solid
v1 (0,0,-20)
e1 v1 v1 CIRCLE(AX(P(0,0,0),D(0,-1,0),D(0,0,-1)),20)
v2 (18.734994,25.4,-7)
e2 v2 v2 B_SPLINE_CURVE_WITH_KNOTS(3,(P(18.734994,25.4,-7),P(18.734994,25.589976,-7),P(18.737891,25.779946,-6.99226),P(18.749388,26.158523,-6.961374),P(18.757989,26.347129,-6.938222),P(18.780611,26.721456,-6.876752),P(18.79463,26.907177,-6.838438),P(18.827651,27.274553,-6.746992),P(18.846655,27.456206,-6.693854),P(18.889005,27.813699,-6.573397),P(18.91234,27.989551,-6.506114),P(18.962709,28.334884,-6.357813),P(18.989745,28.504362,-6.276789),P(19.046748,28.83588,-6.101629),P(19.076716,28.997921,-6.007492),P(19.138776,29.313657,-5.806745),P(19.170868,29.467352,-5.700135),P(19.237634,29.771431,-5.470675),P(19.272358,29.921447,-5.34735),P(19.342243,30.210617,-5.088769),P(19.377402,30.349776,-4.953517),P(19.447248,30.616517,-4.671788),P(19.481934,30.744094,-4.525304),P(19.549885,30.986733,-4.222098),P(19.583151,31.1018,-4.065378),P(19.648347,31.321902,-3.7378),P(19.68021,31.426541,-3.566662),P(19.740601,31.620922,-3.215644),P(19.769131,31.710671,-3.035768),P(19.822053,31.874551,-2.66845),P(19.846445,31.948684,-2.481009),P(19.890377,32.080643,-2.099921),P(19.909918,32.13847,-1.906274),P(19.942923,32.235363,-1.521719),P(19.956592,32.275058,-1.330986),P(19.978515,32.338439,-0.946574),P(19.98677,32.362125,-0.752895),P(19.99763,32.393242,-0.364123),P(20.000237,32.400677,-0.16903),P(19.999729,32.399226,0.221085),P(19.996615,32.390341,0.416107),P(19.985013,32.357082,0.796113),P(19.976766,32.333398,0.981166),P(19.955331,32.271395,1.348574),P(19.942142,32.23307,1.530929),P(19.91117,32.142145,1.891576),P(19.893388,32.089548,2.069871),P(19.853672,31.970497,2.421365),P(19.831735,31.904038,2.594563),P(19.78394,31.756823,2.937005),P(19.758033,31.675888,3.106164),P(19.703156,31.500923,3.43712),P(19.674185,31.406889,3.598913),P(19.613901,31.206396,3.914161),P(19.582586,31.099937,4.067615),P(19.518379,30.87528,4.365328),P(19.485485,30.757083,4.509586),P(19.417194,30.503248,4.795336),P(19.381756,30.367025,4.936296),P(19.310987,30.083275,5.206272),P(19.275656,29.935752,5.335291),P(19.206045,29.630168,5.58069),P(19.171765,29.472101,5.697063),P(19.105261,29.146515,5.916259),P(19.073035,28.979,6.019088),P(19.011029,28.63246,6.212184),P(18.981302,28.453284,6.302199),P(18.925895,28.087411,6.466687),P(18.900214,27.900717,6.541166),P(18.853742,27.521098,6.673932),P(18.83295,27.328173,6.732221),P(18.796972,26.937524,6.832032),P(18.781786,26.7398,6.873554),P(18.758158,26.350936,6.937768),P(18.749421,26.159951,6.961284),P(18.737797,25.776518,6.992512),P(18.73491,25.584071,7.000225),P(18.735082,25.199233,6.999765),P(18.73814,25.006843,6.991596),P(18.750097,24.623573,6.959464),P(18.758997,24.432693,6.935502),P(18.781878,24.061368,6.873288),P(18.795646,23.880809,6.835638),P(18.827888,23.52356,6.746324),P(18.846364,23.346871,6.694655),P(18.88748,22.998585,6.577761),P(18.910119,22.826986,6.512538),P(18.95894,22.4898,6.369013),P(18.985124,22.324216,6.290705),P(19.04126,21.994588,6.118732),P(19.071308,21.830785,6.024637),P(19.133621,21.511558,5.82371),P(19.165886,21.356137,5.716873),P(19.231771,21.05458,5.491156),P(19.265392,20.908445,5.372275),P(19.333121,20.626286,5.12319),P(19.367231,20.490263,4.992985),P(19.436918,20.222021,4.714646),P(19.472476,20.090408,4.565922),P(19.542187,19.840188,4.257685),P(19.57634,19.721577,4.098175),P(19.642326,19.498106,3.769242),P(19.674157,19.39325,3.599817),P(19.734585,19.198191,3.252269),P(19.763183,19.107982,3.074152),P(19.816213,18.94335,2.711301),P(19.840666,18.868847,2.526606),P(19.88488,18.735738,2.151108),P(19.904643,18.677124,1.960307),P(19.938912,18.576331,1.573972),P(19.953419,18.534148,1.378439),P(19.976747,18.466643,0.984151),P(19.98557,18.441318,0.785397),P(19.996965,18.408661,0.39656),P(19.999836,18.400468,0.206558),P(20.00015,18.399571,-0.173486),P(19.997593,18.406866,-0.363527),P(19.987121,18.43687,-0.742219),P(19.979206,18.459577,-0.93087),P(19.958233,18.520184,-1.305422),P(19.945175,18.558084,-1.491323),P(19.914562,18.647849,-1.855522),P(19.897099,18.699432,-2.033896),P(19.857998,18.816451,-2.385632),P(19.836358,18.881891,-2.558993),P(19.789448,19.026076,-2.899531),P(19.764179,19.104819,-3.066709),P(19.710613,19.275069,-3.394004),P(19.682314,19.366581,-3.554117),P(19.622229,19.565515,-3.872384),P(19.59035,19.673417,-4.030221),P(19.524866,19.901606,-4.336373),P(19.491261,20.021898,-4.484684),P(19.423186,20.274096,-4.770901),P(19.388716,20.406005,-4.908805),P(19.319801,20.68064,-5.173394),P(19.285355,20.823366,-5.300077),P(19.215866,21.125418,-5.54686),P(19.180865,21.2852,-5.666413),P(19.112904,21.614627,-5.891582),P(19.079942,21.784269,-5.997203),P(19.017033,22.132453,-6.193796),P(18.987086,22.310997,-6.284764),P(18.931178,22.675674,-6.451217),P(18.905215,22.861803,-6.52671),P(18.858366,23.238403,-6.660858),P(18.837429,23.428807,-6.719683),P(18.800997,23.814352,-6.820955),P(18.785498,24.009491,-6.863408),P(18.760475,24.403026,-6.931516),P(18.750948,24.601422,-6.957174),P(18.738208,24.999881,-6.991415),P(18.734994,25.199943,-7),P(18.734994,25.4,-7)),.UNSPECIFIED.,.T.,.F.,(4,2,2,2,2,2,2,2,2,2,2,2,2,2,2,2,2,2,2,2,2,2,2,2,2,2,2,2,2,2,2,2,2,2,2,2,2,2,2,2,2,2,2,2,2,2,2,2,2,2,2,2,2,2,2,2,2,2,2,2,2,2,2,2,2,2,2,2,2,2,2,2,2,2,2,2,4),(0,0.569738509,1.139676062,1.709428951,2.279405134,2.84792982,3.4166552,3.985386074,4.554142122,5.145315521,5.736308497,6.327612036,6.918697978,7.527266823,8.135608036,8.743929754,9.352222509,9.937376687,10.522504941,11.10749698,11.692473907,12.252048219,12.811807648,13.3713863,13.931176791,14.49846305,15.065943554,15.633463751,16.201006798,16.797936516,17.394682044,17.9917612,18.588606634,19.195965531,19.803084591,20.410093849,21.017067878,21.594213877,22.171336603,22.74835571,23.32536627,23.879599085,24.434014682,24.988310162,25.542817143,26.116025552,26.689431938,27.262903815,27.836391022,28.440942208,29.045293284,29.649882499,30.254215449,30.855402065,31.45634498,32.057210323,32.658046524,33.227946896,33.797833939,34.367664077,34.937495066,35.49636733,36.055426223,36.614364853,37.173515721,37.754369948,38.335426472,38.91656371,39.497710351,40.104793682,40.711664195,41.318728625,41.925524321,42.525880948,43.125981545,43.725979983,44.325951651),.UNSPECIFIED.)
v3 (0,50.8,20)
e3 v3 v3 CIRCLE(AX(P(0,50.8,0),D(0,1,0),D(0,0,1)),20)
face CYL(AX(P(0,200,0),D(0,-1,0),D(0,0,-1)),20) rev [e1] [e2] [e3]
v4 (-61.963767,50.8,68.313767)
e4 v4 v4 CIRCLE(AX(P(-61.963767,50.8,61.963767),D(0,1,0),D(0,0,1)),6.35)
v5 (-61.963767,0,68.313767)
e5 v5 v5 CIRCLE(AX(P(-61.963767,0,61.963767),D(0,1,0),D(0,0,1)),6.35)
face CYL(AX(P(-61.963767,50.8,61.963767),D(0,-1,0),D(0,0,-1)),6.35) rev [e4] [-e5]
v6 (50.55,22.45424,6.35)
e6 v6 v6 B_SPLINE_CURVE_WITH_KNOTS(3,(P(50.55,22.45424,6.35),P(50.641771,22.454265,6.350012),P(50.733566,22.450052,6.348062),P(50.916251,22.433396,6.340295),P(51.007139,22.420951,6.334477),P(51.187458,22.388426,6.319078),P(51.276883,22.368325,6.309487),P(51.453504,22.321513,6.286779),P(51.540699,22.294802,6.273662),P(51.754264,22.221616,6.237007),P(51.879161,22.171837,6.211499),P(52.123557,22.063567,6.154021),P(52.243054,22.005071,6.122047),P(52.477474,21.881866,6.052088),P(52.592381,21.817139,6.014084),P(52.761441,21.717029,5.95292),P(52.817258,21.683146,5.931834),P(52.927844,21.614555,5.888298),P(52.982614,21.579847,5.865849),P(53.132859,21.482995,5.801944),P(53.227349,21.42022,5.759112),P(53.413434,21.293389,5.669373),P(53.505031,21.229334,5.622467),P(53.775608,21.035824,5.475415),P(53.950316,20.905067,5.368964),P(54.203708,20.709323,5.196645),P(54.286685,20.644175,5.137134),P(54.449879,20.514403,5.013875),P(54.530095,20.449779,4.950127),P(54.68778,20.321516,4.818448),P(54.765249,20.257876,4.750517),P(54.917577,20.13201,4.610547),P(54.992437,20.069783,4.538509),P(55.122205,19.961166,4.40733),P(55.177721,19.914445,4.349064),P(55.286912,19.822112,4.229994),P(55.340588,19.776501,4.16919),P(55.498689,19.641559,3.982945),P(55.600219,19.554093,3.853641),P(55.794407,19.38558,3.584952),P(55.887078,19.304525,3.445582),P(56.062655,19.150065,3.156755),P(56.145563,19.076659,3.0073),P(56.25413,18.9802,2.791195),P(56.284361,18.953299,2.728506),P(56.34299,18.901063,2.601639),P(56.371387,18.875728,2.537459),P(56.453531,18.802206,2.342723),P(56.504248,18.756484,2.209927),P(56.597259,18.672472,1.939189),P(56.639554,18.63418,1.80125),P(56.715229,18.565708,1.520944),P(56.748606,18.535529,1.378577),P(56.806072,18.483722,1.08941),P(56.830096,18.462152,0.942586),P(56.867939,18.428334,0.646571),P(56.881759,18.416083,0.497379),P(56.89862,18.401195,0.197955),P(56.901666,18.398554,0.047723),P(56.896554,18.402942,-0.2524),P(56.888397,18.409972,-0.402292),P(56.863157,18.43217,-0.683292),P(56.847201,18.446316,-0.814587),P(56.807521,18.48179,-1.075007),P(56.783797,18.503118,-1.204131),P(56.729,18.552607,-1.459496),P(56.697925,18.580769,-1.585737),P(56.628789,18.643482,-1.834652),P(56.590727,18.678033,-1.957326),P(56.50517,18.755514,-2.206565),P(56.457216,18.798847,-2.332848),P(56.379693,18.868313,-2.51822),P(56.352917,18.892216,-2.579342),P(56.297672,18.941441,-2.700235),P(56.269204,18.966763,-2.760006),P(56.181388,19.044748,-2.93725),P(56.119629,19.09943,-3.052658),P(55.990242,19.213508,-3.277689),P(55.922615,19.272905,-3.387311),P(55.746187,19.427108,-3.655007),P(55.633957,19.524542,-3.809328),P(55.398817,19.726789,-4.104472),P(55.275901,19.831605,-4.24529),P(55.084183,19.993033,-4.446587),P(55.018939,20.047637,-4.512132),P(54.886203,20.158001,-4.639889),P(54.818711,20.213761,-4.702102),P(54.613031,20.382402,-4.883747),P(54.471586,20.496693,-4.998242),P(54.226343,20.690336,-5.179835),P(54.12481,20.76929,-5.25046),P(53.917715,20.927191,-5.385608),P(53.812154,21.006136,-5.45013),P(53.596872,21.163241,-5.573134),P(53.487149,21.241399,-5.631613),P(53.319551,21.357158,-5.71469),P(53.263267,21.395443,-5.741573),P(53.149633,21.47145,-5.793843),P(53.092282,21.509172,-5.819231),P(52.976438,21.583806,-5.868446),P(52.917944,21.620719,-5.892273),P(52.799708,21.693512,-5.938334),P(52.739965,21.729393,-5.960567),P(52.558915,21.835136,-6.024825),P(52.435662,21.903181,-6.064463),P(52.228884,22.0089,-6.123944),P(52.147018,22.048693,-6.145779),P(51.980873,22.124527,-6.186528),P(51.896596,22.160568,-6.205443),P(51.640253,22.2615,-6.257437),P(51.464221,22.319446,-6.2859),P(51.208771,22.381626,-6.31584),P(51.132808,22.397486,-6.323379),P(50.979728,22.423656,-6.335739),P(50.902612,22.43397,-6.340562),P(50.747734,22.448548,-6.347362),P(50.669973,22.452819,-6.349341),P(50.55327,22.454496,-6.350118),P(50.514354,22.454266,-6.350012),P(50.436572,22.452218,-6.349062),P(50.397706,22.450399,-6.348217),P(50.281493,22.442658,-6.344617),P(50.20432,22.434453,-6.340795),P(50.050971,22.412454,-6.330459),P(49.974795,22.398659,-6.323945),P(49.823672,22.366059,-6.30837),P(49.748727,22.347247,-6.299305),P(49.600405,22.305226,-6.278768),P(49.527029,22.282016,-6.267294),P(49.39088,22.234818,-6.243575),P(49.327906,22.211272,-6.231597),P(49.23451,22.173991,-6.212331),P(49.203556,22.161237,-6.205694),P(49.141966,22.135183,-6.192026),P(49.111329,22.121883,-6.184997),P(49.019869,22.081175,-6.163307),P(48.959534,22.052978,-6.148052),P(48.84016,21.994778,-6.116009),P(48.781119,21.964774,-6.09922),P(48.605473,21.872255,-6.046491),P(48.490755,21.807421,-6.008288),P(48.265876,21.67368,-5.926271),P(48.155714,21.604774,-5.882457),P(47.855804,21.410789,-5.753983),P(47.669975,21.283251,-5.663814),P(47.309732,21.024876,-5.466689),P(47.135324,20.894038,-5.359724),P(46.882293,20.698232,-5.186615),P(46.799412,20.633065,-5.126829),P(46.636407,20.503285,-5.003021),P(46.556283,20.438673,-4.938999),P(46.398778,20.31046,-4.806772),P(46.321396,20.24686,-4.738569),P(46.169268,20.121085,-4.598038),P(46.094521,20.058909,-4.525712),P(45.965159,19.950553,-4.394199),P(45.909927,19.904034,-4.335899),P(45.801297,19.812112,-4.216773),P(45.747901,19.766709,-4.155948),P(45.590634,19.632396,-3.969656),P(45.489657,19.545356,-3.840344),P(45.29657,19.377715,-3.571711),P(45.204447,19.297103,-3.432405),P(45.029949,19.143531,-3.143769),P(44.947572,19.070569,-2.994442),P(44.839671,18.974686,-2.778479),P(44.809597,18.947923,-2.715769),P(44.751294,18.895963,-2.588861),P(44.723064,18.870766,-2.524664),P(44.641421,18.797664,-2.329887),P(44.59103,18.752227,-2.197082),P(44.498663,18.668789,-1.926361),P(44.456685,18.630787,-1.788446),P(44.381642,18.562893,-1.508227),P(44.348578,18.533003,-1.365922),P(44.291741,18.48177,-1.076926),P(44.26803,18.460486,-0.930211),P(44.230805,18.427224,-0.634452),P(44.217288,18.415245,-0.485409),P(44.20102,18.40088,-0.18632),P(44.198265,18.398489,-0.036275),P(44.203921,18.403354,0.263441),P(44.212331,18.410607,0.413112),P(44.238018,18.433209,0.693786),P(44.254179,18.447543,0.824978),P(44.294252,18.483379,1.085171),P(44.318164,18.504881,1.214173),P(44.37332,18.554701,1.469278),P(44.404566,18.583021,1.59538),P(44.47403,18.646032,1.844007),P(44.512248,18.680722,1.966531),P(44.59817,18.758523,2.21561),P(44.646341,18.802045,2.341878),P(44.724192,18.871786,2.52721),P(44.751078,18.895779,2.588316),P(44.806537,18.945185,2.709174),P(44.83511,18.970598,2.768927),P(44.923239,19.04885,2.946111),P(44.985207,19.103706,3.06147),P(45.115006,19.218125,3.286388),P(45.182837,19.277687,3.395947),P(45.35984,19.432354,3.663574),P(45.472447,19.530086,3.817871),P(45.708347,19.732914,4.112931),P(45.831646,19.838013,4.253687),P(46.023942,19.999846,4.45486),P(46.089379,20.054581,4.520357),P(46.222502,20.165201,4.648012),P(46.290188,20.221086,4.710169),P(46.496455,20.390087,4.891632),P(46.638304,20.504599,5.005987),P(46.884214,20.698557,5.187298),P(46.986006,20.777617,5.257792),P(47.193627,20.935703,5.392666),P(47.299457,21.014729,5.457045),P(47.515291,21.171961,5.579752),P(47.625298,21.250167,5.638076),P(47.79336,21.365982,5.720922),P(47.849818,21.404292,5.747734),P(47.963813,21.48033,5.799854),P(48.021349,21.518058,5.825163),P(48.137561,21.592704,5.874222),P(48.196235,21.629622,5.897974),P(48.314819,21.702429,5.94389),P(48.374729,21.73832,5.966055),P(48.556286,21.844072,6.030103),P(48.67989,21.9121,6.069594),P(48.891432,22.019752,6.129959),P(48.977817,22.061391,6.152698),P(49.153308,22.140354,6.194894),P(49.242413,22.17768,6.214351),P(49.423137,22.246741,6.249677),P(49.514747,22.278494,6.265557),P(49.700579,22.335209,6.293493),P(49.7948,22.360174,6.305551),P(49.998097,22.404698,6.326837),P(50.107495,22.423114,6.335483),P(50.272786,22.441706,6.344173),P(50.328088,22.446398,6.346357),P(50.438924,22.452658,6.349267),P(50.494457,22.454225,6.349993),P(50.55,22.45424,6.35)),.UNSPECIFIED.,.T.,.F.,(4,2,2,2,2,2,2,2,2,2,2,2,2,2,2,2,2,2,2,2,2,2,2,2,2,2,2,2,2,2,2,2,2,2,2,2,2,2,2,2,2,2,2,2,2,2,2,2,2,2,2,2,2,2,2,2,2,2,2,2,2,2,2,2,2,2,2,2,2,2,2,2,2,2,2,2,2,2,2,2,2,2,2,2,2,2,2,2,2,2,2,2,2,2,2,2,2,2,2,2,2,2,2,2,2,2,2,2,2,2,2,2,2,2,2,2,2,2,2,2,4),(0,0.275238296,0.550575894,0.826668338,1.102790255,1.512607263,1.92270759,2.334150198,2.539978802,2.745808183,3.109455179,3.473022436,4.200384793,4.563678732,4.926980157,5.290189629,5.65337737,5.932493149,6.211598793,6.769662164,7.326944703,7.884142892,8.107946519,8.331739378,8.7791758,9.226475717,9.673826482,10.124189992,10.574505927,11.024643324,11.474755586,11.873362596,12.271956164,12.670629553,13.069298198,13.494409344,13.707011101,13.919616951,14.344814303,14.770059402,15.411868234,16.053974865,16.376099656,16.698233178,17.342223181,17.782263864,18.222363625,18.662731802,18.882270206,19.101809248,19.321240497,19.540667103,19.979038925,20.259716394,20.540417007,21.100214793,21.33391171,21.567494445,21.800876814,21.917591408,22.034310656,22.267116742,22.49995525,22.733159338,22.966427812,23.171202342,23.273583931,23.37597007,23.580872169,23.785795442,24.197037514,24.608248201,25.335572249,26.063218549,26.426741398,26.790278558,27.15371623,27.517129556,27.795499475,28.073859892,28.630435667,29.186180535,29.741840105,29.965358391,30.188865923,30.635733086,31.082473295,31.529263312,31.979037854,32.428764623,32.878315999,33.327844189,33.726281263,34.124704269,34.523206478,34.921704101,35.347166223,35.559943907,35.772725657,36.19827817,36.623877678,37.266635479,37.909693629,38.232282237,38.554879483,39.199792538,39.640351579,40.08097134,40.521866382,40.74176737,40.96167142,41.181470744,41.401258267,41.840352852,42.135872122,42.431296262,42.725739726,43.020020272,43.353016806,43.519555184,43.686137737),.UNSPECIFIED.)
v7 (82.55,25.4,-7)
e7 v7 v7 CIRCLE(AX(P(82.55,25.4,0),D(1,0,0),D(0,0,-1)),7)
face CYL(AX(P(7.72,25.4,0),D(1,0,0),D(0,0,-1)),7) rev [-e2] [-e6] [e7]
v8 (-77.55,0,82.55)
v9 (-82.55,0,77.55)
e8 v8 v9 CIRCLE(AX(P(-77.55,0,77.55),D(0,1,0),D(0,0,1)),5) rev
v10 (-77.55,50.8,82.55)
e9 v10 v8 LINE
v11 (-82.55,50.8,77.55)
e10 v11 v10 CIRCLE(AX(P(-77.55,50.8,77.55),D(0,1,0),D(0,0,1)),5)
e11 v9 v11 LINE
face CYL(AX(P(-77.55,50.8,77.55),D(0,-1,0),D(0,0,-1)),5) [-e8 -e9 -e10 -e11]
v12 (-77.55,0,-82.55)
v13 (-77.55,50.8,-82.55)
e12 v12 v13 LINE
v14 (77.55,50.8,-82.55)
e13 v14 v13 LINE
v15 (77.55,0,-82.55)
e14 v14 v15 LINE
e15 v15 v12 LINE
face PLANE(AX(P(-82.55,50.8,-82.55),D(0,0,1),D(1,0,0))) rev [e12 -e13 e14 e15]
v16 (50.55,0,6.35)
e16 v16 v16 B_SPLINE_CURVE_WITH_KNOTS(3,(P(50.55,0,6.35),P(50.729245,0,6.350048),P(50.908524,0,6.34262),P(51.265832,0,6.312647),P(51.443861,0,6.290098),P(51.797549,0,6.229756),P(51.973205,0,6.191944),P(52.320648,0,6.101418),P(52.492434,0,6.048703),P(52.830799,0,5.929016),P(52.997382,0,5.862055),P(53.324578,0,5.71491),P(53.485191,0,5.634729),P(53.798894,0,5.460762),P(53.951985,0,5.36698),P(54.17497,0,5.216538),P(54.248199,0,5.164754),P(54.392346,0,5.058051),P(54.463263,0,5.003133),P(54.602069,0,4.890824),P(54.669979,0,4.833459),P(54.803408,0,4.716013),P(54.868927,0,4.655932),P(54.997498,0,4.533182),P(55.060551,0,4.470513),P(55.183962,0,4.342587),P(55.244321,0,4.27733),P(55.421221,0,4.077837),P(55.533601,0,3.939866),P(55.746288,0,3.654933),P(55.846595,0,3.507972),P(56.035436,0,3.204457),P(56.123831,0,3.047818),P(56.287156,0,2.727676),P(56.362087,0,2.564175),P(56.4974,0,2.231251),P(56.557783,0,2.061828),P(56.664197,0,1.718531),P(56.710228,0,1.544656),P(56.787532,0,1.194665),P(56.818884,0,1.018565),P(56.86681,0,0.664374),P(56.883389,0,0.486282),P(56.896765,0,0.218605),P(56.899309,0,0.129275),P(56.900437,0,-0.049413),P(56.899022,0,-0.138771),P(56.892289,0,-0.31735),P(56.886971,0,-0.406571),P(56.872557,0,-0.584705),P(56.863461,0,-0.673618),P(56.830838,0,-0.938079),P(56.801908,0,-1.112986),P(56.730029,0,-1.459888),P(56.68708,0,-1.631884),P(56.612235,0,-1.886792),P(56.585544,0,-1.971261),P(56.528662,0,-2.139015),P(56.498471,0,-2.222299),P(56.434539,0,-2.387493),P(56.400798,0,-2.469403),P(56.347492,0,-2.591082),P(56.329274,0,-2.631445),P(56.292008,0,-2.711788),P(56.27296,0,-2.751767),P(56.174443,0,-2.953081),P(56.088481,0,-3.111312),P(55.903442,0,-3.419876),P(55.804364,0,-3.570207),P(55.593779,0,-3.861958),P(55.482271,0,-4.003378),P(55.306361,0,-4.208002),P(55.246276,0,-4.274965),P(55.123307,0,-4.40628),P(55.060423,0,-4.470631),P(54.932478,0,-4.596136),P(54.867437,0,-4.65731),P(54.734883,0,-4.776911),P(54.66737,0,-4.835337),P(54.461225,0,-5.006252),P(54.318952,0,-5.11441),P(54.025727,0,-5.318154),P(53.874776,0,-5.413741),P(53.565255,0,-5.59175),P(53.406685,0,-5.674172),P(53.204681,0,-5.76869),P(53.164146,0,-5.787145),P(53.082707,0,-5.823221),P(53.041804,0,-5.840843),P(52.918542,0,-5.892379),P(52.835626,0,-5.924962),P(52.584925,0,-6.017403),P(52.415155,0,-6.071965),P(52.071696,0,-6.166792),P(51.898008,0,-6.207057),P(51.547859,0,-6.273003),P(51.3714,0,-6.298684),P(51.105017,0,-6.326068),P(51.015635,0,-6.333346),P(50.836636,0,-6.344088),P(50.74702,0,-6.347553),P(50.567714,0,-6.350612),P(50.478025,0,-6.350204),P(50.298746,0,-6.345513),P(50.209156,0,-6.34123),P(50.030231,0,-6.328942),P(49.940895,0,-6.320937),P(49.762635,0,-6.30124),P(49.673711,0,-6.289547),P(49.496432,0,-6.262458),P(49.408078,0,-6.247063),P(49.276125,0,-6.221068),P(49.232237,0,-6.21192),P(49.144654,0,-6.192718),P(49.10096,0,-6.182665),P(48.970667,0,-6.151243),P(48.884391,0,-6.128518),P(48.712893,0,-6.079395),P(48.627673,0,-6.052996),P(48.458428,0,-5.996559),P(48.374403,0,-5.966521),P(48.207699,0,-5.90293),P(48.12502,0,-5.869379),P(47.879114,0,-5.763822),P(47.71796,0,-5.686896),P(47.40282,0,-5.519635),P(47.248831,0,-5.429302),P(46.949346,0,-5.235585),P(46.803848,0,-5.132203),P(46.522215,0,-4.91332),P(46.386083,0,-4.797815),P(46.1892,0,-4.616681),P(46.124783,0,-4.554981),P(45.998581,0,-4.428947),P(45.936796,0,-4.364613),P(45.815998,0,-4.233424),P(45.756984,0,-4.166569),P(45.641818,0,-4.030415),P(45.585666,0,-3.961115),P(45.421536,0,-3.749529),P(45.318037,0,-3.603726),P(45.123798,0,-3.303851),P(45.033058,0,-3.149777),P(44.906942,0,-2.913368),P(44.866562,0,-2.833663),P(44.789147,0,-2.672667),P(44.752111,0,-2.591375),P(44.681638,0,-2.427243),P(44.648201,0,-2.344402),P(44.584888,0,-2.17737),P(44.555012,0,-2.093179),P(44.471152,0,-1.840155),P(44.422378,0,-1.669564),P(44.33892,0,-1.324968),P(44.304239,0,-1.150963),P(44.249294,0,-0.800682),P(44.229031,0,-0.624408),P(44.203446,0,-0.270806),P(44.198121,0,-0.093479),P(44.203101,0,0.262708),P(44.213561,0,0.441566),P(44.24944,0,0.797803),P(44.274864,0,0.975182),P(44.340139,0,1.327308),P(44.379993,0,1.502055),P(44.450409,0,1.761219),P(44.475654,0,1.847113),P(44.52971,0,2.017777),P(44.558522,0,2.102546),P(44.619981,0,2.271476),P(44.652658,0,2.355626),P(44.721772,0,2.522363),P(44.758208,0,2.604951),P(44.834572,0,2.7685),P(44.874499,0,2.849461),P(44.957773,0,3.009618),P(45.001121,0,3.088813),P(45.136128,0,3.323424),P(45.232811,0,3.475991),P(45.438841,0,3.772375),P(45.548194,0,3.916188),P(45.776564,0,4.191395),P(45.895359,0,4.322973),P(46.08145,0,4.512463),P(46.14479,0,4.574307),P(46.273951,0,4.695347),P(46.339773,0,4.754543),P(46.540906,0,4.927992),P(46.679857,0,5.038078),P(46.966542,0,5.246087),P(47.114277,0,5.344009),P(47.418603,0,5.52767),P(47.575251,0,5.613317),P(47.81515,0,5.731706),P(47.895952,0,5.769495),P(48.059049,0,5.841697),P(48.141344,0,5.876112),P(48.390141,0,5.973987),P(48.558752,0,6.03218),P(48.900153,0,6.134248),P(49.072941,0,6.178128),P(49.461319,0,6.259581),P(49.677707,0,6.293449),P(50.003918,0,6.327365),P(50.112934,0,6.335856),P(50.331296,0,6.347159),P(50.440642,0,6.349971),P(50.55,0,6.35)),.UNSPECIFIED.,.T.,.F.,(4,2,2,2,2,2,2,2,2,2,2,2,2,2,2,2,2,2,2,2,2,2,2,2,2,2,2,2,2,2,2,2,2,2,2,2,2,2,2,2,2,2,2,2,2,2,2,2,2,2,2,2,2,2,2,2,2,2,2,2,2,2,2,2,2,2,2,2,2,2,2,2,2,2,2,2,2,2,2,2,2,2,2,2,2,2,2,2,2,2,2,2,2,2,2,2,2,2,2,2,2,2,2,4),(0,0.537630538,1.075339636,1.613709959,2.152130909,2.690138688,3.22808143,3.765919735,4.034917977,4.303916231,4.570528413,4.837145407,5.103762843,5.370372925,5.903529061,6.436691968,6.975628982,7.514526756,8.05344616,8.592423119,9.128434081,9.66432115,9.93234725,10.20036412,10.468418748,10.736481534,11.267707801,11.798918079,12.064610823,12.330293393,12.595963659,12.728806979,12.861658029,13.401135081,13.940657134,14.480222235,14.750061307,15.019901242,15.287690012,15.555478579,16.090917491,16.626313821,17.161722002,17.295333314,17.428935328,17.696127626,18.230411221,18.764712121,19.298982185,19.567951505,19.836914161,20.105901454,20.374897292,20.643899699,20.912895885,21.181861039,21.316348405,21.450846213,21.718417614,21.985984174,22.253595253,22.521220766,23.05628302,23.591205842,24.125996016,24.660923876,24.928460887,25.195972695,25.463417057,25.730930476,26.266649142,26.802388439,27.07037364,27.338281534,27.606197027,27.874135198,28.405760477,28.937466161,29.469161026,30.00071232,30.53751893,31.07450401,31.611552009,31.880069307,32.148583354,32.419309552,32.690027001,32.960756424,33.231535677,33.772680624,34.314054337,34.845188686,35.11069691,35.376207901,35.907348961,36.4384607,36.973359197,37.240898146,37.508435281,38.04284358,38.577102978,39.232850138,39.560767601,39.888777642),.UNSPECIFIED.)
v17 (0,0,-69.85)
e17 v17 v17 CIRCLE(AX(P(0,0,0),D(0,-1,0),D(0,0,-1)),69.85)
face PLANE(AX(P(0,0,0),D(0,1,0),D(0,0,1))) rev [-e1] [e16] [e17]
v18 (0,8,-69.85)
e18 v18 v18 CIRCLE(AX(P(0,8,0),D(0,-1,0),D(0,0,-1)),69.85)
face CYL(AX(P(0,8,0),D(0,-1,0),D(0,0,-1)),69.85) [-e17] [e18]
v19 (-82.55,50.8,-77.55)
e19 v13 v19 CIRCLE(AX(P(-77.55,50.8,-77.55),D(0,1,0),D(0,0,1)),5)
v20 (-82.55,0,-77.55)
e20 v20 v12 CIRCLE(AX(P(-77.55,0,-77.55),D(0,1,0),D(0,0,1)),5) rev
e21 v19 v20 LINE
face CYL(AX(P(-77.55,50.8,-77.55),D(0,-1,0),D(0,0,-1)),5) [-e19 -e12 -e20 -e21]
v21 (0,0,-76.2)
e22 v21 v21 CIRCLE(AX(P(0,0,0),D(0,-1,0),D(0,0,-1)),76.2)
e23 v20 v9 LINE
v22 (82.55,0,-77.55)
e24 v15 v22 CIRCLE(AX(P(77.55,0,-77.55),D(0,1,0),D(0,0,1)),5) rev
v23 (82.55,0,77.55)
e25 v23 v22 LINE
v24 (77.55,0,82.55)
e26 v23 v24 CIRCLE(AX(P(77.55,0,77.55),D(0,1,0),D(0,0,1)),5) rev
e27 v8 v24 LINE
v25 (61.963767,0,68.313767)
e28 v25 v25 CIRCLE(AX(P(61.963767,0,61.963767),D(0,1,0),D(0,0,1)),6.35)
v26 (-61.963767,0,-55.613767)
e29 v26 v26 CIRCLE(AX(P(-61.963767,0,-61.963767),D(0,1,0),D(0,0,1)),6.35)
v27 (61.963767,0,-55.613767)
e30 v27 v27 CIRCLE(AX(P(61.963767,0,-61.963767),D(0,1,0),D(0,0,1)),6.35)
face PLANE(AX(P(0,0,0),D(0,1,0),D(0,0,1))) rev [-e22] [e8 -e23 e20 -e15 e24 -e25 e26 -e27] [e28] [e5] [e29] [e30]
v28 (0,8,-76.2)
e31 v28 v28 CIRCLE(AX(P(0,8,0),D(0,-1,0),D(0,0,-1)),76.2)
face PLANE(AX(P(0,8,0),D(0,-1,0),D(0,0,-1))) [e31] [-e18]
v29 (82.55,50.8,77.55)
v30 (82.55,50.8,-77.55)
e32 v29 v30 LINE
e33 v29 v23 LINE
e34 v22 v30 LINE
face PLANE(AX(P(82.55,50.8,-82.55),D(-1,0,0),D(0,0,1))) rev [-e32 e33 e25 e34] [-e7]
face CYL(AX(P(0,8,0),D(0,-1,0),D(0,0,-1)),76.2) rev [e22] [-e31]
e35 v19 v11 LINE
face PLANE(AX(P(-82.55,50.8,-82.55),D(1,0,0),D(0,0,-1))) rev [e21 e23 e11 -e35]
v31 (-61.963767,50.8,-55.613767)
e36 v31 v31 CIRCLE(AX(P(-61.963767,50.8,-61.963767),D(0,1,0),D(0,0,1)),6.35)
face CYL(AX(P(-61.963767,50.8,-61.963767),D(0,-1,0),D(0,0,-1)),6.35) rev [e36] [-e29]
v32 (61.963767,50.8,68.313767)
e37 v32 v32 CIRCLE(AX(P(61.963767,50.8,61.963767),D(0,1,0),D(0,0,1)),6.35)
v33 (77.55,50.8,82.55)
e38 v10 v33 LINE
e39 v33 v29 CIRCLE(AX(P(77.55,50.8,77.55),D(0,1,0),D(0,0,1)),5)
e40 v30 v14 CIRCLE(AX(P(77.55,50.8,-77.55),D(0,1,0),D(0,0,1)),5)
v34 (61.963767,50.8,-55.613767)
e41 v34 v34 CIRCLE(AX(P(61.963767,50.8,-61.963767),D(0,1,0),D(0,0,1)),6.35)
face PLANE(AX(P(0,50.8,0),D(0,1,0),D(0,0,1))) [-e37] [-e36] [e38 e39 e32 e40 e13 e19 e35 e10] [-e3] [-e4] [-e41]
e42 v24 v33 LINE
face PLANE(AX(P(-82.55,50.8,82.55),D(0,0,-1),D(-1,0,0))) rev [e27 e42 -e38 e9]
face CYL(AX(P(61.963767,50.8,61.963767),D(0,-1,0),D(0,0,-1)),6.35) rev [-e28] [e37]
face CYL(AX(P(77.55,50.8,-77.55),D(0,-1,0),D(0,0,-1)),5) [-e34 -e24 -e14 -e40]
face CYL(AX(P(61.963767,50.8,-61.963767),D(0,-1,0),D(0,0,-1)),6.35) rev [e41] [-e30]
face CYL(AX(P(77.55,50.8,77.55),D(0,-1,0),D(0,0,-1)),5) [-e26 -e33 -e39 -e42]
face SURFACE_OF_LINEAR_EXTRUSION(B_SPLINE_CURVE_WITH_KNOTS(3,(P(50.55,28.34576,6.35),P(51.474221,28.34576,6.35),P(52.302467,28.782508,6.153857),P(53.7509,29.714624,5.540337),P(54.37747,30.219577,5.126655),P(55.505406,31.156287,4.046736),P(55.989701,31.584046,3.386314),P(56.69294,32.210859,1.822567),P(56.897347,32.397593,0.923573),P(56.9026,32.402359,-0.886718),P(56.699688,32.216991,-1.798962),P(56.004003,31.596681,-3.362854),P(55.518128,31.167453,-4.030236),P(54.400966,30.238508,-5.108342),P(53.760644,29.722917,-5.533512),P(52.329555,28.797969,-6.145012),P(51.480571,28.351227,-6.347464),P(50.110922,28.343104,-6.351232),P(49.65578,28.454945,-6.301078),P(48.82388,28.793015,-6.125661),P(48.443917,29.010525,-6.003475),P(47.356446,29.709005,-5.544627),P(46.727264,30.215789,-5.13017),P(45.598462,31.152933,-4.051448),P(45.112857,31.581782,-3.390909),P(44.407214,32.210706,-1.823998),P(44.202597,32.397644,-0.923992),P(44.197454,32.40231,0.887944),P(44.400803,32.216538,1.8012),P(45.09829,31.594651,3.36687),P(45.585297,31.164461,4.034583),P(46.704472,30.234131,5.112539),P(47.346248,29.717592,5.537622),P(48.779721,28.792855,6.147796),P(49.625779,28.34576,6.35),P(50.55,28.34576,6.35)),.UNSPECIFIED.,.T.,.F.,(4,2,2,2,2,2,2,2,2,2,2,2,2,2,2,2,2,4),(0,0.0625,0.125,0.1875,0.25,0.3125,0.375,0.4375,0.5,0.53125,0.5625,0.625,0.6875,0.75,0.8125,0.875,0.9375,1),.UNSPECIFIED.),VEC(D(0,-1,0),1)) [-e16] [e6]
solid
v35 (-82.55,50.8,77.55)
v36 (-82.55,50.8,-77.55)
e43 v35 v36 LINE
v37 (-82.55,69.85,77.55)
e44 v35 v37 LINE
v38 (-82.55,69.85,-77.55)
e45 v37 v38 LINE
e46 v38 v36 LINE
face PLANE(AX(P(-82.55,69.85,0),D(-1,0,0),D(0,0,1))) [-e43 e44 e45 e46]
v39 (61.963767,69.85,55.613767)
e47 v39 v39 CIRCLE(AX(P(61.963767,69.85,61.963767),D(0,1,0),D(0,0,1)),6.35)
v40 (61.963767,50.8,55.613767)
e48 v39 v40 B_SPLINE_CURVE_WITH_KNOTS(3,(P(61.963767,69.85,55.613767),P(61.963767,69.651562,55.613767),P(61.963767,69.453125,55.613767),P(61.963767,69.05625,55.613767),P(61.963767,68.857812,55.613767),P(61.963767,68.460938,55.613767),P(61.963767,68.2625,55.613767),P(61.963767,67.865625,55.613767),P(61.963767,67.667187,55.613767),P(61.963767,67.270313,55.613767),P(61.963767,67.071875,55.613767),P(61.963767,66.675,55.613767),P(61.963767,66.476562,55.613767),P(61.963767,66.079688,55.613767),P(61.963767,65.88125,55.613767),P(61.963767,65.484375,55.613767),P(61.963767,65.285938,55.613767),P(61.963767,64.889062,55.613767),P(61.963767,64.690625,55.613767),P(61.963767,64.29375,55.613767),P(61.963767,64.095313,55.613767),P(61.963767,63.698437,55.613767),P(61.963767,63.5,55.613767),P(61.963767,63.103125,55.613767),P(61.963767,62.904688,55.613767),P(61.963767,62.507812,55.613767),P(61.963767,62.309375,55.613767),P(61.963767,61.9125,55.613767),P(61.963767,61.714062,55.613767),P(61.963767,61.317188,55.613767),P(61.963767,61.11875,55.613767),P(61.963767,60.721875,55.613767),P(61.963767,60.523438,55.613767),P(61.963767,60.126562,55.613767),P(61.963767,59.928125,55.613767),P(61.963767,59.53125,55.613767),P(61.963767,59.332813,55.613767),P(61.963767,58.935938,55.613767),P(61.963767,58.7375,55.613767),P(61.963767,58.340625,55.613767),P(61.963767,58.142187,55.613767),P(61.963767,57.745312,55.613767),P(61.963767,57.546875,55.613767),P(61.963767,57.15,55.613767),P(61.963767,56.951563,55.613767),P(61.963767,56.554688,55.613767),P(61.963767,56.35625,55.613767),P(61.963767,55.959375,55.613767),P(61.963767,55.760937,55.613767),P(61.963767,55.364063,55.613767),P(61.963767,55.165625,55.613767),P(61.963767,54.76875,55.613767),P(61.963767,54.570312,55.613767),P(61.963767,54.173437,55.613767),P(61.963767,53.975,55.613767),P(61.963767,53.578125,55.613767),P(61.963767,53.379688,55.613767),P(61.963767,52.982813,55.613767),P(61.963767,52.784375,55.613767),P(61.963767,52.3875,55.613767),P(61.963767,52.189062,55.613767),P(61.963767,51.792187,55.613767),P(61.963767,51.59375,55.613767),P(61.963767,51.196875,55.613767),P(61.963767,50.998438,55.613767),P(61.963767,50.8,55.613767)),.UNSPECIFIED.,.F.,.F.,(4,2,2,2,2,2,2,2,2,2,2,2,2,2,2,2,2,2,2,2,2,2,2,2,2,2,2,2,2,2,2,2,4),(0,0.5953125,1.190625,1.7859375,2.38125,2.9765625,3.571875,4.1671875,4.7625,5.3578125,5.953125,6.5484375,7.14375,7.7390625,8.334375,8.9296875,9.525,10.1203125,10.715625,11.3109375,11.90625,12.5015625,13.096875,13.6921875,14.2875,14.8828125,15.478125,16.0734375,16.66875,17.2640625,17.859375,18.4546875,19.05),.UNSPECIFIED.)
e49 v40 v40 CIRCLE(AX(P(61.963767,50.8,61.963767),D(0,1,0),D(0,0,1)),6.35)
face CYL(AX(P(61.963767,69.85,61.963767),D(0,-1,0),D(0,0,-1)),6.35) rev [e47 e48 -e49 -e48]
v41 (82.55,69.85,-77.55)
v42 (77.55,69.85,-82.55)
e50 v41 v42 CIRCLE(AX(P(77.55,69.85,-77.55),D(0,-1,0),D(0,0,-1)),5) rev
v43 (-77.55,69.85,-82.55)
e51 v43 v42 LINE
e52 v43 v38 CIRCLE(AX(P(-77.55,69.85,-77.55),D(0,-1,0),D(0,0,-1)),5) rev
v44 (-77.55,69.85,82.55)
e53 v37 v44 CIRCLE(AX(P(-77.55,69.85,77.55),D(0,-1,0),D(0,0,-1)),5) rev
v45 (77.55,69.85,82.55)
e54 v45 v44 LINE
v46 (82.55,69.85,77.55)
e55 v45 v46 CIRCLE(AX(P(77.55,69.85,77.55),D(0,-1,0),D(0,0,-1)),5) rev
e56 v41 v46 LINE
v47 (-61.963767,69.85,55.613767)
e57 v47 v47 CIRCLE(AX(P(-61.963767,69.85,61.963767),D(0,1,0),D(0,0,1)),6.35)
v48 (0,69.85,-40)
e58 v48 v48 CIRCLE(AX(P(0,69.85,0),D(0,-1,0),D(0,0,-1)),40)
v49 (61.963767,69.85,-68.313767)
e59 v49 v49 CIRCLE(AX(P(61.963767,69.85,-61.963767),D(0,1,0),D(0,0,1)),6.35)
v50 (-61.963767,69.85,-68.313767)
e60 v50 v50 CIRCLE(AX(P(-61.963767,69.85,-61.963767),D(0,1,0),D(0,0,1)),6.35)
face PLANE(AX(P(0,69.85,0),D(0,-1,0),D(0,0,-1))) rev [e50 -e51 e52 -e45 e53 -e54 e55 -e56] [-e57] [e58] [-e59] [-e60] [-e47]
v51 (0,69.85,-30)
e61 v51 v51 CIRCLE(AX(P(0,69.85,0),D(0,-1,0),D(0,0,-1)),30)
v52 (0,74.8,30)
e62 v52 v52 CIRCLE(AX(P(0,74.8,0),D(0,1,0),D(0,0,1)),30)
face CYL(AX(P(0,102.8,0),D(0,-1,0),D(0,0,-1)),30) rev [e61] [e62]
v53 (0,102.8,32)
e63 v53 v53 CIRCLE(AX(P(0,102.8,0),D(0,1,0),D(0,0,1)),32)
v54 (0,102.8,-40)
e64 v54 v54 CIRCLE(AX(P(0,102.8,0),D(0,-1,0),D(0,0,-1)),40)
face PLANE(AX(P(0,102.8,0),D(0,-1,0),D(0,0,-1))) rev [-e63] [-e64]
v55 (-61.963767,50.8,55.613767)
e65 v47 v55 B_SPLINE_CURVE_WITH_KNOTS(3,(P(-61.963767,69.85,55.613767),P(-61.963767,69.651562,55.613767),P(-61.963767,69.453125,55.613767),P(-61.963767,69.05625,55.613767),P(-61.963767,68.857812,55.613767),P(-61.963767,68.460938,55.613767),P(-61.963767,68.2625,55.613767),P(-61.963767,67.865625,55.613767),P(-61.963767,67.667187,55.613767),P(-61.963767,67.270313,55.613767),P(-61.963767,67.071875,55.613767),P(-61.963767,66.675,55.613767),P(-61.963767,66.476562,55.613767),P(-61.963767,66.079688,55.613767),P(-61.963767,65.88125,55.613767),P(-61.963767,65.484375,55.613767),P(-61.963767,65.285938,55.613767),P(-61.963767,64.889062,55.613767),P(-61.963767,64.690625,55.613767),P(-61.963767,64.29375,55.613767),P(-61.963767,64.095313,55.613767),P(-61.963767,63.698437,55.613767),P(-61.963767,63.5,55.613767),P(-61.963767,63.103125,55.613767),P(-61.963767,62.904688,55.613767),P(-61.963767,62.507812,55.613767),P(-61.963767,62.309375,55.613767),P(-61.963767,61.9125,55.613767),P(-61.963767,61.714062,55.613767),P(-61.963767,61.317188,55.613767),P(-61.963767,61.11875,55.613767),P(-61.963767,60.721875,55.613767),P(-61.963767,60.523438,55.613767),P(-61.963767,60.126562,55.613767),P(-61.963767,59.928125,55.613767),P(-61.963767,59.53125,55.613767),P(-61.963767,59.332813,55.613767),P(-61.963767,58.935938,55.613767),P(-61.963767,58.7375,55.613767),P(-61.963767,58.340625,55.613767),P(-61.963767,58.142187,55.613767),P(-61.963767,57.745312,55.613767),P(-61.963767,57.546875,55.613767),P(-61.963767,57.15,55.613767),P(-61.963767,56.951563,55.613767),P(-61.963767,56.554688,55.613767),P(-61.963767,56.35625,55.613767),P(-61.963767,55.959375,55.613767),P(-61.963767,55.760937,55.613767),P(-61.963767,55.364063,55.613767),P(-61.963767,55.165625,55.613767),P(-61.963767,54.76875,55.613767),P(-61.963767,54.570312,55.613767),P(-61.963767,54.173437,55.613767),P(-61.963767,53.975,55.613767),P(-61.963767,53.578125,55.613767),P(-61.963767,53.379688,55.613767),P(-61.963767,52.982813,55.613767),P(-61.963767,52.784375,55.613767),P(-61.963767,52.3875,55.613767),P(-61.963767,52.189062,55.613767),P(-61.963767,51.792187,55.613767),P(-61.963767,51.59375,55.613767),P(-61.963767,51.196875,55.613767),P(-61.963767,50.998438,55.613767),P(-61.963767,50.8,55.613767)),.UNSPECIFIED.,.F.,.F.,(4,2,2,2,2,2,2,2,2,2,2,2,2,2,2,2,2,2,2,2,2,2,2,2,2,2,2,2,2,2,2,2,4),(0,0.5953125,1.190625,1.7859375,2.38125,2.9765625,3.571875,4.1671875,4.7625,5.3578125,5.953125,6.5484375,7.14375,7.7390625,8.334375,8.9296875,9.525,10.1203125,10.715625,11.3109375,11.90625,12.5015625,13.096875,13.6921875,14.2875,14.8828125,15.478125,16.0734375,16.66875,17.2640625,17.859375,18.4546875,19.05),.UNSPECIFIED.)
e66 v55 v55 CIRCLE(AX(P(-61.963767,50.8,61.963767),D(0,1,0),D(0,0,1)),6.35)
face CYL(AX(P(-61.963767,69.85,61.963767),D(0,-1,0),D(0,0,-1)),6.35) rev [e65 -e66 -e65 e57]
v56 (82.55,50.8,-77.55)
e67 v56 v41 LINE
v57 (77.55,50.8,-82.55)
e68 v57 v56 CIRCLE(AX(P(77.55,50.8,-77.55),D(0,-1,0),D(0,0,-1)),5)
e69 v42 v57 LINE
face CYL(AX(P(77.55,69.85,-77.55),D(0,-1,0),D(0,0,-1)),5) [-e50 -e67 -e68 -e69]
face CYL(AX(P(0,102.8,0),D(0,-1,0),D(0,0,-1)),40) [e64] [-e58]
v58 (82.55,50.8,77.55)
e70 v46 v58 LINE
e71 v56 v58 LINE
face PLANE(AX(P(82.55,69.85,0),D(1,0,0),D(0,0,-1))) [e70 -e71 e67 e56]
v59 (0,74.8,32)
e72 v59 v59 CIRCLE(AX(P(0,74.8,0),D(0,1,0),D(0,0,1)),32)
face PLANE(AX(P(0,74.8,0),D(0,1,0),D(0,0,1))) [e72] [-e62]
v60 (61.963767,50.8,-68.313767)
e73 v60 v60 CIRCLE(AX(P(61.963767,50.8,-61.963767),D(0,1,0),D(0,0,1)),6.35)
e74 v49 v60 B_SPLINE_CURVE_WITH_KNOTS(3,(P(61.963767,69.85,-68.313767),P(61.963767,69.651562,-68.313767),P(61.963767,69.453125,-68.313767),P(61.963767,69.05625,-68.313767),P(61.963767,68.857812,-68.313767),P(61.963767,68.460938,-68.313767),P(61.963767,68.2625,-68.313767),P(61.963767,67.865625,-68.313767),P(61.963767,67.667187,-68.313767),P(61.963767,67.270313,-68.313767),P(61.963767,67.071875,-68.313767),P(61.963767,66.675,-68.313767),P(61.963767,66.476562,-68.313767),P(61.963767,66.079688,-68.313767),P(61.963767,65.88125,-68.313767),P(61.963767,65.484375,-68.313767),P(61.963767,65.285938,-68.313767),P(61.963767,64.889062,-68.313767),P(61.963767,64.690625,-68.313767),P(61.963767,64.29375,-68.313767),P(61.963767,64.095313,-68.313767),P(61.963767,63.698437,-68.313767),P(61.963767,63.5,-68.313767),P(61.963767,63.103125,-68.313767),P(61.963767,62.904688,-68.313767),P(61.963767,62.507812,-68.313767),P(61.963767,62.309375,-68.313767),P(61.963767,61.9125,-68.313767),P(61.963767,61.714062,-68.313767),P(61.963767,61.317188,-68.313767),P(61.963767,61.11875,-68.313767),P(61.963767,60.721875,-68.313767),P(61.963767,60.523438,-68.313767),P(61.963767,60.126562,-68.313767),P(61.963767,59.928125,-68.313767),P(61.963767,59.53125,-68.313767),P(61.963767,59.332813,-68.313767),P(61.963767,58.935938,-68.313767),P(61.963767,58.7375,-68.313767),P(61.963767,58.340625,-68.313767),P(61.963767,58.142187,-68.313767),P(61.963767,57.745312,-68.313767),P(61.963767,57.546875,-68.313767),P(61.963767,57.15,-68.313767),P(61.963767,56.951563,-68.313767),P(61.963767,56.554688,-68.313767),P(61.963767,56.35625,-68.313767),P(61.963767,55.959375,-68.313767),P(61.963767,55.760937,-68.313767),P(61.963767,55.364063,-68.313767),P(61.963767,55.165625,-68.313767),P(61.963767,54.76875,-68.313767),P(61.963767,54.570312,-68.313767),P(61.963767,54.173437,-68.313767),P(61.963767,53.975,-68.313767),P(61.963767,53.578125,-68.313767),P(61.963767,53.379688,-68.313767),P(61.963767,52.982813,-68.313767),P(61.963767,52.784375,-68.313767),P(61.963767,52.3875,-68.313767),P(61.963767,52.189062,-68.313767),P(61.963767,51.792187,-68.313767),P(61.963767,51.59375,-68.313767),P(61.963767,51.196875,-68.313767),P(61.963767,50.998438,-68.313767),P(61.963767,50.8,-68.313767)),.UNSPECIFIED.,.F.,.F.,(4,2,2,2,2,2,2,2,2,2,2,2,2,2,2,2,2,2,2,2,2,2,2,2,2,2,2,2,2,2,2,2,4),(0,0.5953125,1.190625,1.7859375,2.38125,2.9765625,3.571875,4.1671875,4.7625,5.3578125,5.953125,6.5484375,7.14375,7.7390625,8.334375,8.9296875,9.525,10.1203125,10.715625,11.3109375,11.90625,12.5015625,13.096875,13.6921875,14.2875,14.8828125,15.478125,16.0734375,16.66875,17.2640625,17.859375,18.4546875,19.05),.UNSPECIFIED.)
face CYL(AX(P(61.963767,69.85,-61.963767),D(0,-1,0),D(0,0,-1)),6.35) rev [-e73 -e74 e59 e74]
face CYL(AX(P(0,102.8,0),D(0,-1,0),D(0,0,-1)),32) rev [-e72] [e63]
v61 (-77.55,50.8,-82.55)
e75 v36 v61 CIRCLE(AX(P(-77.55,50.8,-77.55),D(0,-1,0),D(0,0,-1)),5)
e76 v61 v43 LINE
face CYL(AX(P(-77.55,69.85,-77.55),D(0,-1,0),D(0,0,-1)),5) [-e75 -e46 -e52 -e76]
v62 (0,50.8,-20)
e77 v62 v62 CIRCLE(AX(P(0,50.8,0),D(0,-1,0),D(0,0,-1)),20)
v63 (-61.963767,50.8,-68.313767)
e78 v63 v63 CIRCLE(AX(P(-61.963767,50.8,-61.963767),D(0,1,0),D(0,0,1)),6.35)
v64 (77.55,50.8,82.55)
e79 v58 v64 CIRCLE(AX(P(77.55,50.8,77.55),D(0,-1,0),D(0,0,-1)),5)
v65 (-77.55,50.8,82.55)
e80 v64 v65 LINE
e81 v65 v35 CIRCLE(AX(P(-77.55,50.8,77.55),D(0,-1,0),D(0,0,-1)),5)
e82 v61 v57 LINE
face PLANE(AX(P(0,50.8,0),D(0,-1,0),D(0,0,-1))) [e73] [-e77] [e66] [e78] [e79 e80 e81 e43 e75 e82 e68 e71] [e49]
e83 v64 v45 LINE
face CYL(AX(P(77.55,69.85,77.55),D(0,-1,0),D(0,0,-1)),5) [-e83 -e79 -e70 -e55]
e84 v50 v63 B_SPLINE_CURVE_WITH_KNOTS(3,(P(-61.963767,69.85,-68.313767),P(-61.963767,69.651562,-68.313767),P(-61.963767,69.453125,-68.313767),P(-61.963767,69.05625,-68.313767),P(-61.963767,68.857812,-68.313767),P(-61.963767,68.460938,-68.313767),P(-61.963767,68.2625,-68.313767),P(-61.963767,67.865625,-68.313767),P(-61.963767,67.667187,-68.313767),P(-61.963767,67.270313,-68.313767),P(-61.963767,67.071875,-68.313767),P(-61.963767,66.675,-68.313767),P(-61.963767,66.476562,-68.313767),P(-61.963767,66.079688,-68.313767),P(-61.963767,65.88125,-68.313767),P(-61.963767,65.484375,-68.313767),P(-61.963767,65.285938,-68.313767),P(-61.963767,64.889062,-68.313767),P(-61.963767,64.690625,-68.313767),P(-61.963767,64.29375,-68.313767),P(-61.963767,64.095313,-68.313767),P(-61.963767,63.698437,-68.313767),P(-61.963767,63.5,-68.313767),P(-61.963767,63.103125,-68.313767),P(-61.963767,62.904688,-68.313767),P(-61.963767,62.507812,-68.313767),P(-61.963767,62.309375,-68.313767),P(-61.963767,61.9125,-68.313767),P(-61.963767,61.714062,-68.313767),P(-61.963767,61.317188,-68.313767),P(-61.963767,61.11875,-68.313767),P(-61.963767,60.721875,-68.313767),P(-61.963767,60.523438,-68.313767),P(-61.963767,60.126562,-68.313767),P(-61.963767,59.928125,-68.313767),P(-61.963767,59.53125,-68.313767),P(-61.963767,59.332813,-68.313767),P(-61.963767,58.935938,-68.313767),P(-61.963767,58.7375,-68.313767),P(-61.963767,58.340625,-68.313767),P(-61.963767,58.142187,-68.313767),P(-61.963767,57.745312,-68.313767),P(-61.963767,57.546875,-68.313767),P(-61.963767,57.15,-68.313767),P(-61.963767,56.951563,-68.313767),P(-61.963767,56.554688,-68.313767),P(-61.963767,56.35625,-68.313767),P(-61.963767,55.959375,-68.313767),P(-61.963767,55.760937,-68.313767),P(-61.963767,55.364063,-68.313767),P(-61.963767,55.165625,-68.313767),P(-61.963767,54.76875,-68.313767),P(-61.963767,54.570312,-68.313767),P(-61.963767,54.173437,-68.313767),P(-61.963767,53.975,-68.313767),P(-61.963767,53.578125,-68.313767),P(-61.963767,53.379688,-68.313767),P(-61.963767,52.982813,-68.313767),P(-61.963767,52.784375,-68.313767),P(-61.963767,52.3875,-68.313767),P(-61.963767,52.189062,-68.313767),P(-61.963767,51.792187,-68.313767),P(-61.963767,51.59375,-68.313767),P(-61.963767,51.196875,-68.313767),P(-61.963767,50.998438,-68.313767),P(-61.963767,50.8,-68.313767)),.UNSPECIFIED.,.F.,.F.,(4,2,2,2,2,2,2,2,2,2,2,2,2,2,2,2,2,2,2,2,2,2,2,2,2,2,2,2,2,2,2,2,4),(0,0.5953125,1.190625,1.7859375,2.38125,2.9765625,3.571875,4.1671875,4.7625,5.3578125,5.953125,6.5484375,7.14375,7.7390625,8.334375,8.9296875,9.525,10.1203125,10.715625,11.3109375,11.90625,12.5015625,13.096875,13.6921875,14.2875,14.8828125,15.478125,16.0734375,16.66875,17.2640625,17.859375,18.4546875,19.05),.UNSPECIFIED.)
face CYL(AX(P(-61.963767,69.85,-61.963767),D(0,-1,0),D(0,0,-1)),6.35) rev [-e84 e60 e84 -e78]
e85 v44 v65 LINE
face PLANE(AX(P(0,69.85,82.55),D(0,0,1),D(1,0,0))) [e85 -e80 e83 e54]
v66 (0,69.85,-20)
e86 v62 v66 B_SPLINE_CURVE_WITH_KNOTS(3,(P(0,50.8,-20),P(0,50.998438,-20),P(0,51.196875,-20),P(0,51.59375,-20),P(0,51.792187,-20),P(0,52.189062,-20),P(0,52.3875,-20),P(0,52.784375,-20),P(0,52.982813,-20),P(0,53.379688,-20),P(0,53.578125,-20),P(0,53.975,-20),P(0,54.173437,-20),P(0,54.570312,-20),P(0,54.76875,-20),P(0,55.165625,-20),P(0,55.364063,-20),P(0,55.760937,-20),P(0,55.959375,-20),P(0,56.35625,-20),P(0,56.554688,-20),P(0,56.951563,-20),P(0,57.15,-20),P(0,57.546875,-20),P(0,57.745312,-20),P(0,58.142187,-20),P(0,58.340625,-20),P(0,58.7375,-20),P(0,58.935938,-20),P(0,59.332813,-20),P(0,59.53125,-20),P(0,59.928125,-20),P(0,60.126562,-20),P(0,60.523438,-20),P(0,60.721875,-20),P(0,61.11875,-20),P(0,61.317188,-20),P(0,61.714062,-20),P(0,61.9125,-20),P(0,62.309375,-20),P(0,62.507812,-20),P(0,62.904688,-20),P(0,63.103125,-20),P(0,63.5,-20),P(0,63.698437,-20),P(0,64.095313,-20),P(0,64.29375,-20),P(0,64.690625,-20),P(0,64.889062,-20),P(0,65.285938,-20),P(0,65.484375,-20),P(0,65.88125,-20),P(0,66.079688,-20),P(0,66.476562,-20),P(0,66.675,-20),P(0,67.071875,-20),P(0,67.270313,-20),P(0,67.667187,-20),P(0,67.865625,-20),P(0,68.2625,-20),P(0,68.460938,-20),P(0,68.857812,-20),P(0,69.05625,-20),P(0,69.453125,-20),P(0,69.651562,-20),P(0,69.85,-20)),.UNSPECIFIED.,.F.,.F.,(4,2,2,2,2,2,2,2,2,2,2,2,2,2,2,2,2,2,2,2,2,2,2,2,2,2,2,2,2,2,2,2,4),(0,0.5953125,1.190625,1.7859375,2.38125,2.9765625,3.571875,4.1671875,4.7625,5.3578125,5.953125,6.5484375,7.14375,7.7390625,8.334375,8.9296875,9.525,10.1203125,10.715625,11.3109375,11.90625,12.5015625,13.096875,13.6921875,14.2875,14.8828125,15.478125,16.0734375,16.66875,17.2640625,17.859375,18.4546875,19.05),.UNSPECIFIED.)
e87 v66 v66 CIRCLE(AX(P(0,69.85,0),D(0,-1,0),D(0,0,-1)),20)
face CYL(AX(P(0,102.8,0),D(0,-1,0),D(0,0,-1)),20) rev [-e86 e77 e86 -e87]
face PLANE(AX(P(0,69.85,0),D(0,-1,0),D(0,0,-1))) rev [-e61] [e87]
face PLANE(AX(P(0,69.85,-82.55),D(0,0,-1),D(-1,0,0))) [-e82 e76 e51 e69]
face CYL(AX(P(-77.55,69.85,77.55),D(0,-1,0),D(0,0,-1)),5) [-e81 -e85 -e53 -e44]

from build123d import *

# Parameters (mm, degrees)
SKETCH1_W           = 165.1
SKETCH1_H           = 165.1
SKETCH1_R           = 6.35
BOSS_EXTRUDE1_DEPTH = 50.8
SKETCH3_R           = 20
CUT_EXTRUDE1_DEPTH  = 200
SKETCH4_R           = 7
CUT_EXTRUDE2_DEPTH  = 74.83
CUT_EXTRUDE3_START  = -52
CUT_EXTRUDE3_DEPTH  = 23.654240545
FILLET1_R           = 5
SKETCH6_R           = 76.2
SKETCH6_R_2         = 69.85
CUT_EXTRUDE4_DEPTH  = 8
BOSS_EXTRUDE3_START = 50.8
SKETCH1_2_W         = 165.1
SKETCH1_2_H         = 165.1
SKETCH1_2_R         = 6.35
BOSS_EXTRUDE3_DEPTH = 19.05
FILLET2_R           = 5
BOSS_EXTRUDE4_START = 19.05
SKETCH7_R           = 40
SKETCH7_R_2         = 32
SKETCH7_R_3         = 30
BOSS_EXTRUDE4_DEPTH = 32.95
CUT_EXTRUDE5_START  = 24
SKETCH7_3_R         = 32
SKETCH7_3_R_2       = 30
CUT_EXTRUDE5_DEPTH  = 28
SKETCH3_2_R         = 20
CUT_EXTRUDE6_DEPTH  = 156.55335103


with BuildPart() as part:
    # Sketch1 → Boss-Extrude1 (new body)
    with BuildSketch(Plane(origin=(0, 0, 0), x_dir=(1, 0, 0), z_dir=(0, 1, 0))):
        Rectangle(SKETCH1_W, SKETCH1_H)
        with Locations(Location((-61.963767235, 61.963767235, 0), (0, 0, 270))):
            Circle(SKETCH1_R, mode=Mode.SUBTRACT)
        with Locations(Location((61.963767235, 61.963767235, 0), (0, 0, 270))):
            Circle(SKETCH1_R, mode=Mode.SUBTRACT)
        with Locations(Location((61.963767235, -61.963767235, 0), (0, 0, 270))):
            Circle(SKETCH1_R, mode=Mode.SUBTRACT)
        with Locations(Location((-61.963767235, -61.963767235, 0), (0, 0, 270))):
            Circle(SKETCH1_R, mode=Mode.SUBTRACT)
    extrude(amount=BOSS_EXTRUDE1_DEPTH)

    # Sketch3 → Cut-Extrude1 (cut)
    with BuildSketch(Plane.XZ):
        with Locations(Location((0, 0, 0), (0, 0, 270))):
            Circle(SKETCH3_R)
    extrude(amount=-CUT_EXTRUDE1_DEPTH, mode=Mode.SUBTRACT)

    # Sketch4 → Cut-Extrude2 (cut)
    with BuildSketch(Plane(origin=(82.55, 0, 0), x_dir=(0, 0, -1), z_dir=(1, 0, 0))):
        with Locations((0, 25.4)):
            Circle(SKETCH4_R)
    extrude(amount=-CUT_EXTRUDE2_DEPTH, mode=Mode.SUBTRACT)

    # Cut-Extrude3: read off the stored shape, not the designer's step
    # Cut-Extrude3 outline → Cut-Extrude3 (cut)
    with BuildSketch(Plane(origin=(0, 50.8, 0), x_dir=(1, 0, 0), z_dir=(0, 1, 0)).offset(CUT_EXTRUDE3_START)):
        with BuildLine():
            add(Edge.make_bspline(
                [(50.55, -6.35), (51.47422126, -6.35), (52.302466674, -6.153856691), (53.750900163, -5.540336611), (54.377469866, -5.126654902), (55.505405632, -4.046735856), (55.989700628, -3.386313597), (56.692940175, -1.822566515), (56.897346558, -0.923572623), (56.902599966, 0.886717767), (56.699688489, 1.798962244), (56.004003016, 3.362853664), (55.518127515, 4.030235701), (54.400965604, 5.108341681), (53.760643664, 5.533511906), (52.329554982, 6.145011865), (51.480571337, 6.347463595), (50.110922006, 6.351232148), (49.655780423, 6.301077578), (48.823880157, 6.125660583), (48.443917363, 6.00347472), (47.356446167, 5.544626686), (46.727263651, 5.130170088), (45.598462304, 4.051448232), (45.112857079, 3.390908719), (44.407214336, 1.82399818), (44.202597079, 0.923991808), (44.197454079, -0.88794427), (44.40080252, -1.801200354), (45.098290108, -3.366869707), (45.585297177, -4.034583157), (46.704472395, -5.112538783), (47.346247575, -5.537622225), (48.779720786, -6.147796435), (49.62577874, -6.35), (50.55, -6.35)],
                knots=[0, 0, 0, 0, 0.0625, 0.0625, 0.125, 0.125, 0.1875, 0.1875, 0.25, 0.25, 0.3125, 0.3125, 0.375, 0.375, 0.4375, 0.4375, 0.5, 0.5, 0.53125, 0.53125, 0.5625, 0.5625, 0.625, 0.625, 0.6875, 0.6875, 0.75, 0.75, 0.8125, 0.8125, 0.875, 0.875, 0.9375, 0.9375, 1, 1, 1, 1], degree=3))
        make_face()
    extrude(amount=CUT_EXTRUDE3_DEPTH, mode=Mode.SUBTRACT)

    # Fillet1
    fillet1_edges = [part.edges().sort_by_distance(p)[0] for p in [
        (82.55, 25.4, 82.55),
        (-82.55, 25.4, 82.55),
        (-82.55, 25.4, -82.55),
        (82.55, 25.4, -82.55),
    ]]
    fillet(fillet1_edges, radius=FILLET1_R)

    # Sketch6 → Cut-Extrude4 (cut)
    with BuildSketch(Plane.XZ):
        with Locations(Location((0, 0, 0), (0, 0, 270))):
            Circle(SKETCH6_R)
        with Locations(Location((0, 0, 0), (0, 0, 270))):
            Circle(SKETCH6_R_2, mode=Mode.SUBTRACT)
    extrude(amount=-CUT_EXTRUDE4_DEPTH, mode=Mode.SUBTRACT)


with BuildPart() as body_2:
    # Sketch1<2> → Boss-Extrude3 (new body)
    with BuildSketch(Plane(origin=(0, 0, 0), x_dir=(1, 0, 0), z_dir=(0, 1, 0)).offset(BOSS_EXTRUDE3_START)):
        Rectangle(SKETCH1_2_W, SKETCH1_2_H)
        with Locations(Location((-61.963767235, 61.963767235, 0), (0, 0, 90))):
            Circle(SKETCH1_2_R, mode=Mode.SUBTRACT)
        with Locations(Location((61.963767235, 61.963767235, 0), (0, 0, 90))):
            Circle(SKETCH1_2_R, mode=Mode.SUBTRACT)
        with Locations(Location((61.963767235, -61.963767235, 0), (0, 0, 90))):
            Circle(SKETCH1_2_R, mode=Mode.SUBTRACT)
        with Locations(Location((-61.963767235, -61.963767235, 0), (0, 0, 90))):
            Circle(SKETCH1_2_R, mode=Mode.SUBTRACT)
    extrude(amount=BOSS_EXTRUDE3_DEPTH)

    # Fillet2
    fillet2_edges = [body_2.edges().sort_by_distance(p)[0] for p in [
        (-82.55, 60.325, 82.55),
        (82.55, 60.325, 82.55),
        (82.55, 60.325, -82.55),
        (-82.55, 60.325, -82.55),
    ]]
    fillet(fillet2_edges, radius=FILLET2_R)

    # Sketch7 → Boss-Extrude4 (add)
    # profile 1 of 2: a face of its own
    with BuildSketch(Plane(origin=(0, 50.8, 0), x_dir=(1, 0, 0), z_dir=(0, 1, 0)).offset(BOSS_EXTRUDE4_START)):
        with Locations(Location((0, 0, 0), (0, 0, 90))):
            Circle(SKETCH7_R)
        Circle(SKETCH7_R_2, mode=Mode.SUBTRACT)
    # profile 2 of 2: a face of its own
    with BuildSketch(Plane(origin=(0, 50.8, 0), x_dir=(1, 0, 0), z_dir=(0, 1, 0)).offset(BOSS_EXTRUDE4_START)):
        Circle(SKETCH7_R_2)
        with Locations(Location((0, 0, 0), (0, 0, 90))):
            Circle(SKETCH7_R_3, mode=Mode.SUBTRACT)
    extrude(amount=BOSS_EXTRUDE4_DEPTH)

    # Sketch7<3> → Cut-Extrude5 (cut)
    with BuildSketch(Plane(origin=(0, 50.8, 0), x_dir=(1, 0, 0), z_dir=(0, 1, 0)).offset(CUT_EXTRUDE5_START)):
        with Locations(Location((0, 0, 0), (0, 0, 270))):
            Circle(SKETCH7_3_R)
        with Locations(Location((0, 0, 0), (0, 0, 90))):
            Circle(SKETCH7_3_R_2, mode=Mode.SUBTRACT)
    extrude(amount=CUT_EXTRUDE5_DEPTH, mode=Mode.SUBTRACT)

    # Sketch3<2> → Cut-Extrude6 (cut, through all)
    with BuildSketch(Plane.XZ):
        with Locations(Location((0, 0, 0), (0, 0, 270))):
            Circle(SKETCH3_2_R)
    extrude(amount=-CUT_EXTRUDE6_DEPTH, mode=Mode.SUBTRACT)


solid = Compound([part.part, body_2.part])
